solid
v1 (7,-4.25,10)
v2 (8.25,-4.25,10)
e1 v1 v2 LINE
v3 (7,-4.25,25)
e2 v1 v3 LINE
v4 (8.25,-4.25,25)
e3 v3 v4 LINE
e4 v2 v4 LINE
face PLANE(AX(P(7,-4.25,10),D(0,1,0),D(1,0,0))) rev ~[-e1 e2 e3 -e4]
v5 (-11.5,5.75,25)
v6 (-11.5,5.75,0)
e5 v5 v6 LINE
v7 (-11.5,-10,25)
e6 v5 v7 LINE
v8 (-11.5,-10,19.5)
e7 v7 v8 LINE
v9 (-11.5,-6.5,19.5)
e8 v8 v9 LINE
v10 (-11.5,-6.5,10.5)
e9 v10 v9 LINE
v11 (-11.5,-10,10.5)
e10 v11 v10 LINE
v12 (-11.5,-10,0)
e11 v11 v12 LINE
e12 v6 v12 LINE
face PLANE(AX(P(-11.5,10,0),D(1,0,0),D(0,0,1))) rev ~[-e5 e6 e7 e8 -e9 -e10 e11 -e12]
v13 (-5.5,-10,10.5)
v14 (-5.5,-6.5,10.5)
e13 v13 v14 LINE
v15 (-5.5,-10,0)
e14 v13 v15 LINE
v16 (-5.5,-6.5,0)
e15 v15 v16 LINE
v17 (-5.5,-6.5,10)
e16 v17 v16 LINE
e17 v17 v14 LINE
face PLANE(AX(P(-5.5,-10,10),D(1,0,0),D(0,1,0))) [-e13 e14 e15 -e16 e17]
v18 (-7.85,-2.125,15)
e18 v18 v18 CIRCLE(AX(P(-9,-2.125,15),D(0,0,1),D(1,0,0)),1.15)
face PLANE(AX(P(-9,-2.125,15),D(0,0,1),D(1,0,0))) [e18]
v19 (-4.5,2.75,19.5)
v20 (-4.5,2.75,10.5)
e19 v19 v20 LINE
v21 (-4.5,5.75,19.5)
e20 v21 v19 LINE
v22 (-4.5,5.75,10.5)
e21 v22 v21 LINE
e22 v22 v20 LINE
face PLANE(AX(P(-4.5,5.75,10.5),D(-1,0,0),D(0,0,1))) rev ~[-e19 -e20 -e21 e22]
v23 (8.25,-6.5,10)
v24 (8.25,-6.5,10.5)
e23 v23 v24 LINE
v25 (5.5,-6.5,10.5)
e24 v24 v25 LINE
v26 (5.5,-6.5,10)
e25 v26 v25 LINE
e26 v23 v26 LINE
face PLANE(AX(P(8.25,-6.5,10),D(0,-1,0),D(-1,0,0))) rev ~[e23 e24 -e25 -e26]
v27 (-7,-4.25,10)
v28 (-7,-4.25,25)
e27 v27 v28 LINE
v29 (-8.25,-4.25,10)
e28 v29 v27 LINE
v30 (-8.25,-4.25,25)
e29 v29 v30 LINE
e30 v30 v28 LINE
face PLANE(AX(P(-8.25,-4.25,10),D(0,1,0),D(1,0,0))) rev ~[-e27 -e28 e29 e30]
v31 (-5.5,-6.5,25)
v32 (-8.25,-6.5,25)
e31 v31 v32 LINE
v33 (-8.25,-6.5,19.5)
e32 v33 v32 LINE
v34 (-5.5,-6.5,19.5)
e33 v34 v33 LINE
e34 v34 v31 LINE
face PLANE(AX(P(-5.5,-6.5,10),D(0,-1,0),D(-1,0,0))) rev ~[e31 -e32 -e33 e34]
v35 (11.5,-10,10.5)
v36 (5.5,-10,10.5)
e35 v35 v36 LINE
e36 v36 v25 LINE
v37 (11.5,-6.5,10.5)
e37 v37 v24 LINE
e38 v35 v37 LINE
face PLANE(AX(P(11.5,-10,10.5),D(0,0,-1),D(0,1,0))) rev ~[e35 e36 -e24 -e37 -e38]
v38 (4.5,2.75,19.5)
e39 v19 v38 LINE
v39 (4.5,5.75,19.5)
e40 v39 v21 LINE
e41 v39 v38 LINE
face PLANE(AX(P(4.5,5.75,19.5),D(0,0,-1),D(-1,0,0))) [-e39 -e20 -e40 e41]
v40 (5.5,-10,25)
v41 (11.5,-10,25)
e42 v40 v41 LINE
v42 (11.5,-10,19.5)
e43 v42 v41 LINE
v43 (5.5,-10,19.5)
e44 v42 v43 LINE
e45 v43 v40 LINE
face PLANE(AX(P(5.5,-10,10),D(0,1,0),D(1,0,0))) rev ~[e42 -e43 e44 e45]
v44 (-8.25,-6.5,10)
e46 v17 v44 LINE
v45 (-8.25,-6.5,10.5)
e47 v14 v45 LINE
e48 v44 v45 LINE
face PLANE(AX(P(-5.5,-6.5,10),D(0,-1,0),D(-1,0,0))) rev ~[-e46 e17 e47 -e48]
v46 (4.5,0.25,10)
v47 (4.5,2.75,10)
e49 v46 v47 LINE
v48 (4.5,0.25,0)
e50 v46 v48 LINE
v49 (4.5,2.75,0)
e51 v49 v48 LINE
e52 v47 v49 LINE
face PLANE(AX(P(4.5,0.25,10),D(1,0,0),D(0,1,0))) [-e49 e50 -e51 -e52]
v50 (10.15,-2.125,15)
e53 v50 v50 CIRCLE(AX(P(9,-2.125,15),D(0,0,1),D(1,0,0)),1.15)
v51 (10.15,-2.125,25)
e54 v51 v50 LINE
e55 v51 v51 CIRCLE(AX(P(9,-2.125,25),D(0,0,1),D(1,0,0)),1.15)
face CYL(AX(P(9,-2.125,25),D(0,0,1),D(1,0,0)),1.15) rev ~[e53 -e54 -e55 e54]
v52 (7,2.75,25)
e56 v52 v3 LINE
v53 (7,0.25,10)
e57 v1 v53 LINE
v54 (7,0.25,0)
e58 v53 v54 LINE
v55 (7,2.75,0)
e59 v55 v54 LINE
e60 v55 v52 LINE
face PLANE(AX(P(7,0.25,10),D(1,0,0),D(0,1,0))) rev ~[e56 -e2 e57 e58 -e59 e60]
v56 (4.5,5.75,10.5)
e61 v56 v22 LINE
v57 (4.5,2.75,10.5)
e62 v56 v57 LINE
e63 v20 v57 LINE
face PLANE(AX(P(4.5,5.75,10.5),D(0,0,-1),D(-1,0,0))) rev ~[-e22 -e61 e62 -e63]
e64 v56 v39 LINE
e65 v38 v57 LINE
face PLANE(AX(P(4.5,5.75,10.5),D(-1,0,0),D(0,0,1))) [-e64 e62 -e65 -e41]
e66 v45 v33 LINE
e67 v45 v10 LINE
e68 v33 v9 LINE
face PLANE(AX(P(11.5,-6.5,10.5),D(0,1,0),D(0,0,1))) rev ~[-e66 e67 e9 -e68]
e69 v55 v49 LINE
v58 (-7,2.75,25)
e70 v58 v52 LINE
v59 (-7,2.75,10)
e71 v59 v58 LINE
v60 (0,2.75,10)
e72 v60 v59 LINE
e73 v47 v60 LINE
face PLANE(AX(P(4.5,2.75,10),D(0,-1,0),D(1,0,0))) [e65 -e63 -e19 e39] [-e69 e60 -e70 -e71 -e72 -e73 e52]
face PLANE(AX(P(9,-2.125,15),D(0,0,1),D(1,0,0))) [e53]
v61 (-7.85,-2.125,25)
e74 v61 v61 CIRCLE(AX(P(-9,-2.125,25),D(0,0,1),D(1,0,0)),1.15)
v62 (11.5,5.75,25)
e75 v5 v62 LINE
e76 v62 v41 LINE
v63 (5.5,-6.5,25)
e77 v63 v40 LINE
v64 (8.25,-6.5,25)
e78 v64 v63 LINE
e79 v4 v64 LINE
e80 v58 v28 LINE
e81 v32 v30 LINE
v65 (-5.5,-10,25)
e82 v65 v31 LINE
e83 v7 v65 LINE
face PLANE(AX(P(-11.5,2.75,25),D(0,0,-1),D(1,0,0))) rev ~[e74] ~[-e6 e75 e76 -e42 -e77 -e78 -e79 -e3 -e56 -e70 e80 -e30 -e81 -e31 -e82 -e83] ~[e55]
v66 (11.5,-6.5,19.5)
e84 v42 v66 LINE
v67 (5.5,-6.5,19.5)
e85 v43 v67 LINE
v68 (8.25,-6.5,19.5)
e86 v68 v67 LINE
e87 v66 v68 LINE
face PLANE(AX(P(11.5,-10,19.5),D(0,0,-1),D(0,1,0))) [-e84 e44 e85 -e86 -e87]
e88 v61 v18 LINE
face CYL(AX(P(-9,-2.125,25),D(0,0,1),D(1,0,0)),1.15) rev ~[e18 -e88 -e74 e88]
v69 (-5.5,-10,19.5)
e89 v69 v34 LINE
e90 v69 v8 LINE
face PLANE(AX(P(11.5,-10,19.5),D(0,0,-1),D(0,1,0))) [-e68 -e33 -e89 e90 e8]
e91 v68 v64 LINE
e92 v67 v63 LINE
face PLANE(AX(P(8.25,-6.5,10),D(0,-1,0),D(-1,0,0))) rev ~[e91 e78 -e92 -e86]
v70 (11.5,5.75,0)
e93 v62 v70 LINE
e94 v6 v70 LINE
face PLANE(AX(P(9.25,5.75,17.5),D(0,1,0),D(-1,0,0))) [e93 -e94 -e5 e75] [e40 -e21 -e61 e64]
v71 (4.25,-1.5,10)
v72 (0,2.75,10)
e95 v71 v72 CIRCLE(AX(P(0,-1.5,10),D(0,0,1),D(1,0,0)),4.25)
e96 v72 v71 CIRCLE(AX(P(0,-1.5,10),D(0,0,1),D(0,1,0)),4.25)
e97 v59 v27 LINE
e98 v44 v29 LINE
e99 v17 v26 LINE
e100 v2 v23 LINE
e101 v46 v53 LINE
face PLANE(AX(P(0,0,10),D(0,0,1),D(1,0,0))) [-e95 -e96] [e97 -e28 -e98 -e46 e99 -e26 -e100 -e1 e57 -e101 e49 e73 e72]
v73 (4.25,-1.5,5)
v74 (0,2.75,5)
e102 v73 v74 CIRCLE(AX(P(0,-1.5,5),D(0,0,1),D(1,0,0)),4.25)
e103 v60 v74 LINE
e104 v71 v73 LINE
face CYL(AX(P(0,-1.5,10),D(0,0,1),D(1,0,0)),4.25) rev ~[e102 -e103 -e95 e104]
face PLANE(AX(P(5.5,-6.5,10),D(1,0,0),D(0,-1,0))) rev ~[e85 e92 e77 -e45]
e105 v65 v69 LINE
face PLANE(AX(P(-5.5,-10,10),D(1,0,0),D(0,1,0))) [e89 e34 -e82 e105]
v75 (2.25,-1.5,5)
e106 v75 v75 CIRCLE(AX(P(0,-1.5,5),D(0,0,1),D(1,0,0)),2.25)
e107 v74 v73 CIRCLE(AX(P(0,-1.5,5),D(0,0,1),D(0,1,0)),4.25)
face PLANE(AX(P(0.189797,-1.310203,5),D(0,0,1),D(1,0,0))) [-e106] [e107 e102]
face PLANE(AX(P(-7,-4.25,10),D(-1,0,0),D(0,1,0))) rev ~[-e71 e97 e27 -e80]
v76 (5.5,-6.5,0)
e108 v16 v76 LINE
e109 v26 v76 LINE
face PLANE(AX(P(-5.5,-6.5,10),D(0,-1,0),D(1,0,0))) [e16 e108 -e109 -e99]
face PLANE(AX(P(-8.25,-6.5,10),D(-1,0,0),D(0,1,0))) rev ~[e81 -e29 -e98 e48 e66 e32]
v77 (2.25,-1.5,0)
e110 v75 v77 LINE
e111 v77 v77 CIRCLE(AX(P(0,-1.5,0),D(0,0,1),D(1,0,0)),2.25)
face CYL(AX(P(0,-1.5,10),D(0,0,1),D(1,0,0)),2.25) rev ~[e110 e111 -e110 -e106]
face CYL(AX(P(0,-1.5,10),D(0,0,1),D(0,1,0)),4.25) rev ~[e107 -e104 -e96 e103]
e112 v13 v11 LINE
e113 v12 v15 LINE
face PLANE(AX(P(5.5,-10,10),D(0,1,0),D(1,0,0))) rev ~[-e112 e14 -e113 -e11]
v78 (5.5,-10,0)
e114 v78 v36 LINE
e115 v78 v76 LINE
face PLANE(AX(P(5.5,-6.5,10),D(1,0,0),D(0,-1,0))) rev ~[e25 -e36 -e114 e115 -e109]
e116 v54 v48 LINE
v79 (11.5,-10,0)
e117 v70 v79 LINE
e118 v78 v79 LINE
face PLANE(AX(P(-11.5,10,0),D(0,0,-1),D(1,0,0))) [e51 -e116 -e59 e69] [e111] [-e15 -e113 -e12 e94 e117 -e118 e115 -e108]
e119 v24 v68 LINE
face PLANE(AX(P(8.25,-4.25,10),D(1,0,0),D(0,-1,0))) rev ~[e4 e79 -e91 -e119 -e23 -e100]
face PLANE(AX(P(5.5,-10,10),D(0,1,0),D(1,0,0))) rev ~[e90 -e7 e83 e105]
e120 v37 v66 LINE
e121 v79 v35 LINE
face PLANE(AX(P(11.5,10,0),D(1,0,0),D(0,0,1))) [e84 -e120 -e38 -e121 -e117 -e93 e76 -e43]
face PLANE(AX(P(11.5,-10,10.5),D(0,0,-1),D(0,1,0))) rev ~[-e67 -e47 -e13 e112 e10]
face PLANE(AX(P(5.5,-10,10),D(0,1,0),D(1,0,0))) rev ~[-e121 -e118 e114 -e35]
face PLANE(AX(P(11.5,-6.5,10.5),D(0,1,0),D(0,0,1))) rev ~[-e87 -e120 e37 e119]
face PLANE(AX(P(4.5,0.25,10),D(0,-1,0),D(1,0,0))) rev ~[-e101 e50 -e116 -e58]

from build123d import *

# Parameters (mm, degrees)
F0_W      = 23
F0_H      = 20
F1_DEPTH  = 10
F3_DEPTH  = 15
F4_W      = 11
F4_H      = 3.5
F5_DEPTH  = 10.001
F6_DEPTH  = 3.5
F7_W      = 4.5
F7_H      = 15
F7_W_2    = 18.5
F8_DEPTH  = 3
F9_DEPTH  = 7
F10_R     = 2.5
F11_DEPTH = 10.001
F10_R_2   = 5
F12_DEPTH = 4.5
F16_R     = 1.15
F17_DEPTH = 10
F18_R     = 2.25
F19_DEPTH = 10.001
F20_DEPTH = 5
F21_DEPTH = 10.001
F22_W     = 2.5
F22_H     = 2.5
F23_DEPTH = 10.001
F24_W     = 9
F24_H     = 9
F25_DEPTH = 15.751
F26_W     = 3.5
F26_H     = 9
F27_DEPTH = 23.001


# Not quite as in the source:
# - a feature names something its author has since deleted; it is built from what else it names


with BuildPart() as f1:
    # F0 (on Top) → F1 (new body)
    with BuildSketch(Plane.XY):
        Rectangle(F0_W, F0_H)
    extrude(amount=F1_DEPTH)

    # F2 (on face) → F3 (join)
    with BuildSketch(Plane.XY.offset(10)):
        Polygon((5.5, -6.5), (5.5, -10), (11.5, -10), (11.5, -0.75), (7, -0.75), (7, -4.25), (8.25, -4.25), (8.25, -6.5), align=None)
        Polygon((-11.5, -10), (-5.5, -10), (-5.5, -6.5), (-8.25, -6.5), (-8.25, -4.25), (-7, -4.25), (-7, -0.75), (-11.5, -0.75), align=None)
    extrude(amount=F3_DEPTH)

    # F4 (on face) → F5 (cut, through all)
    with BuildSketch(Plane.XY.offset(10)):
        with Locations((0, -8.25)):
            Rectangle(F4_W, F4_H)
    extrude(amount=-F5_DEPTH, mode=Mode.SUBTRACT)

    # F6 (add): faces of the model
    f6_faces = [f1.faces().sort_by_distance(p)[0] for p in [
        (9.25, -0.75, 17.5),
        (-9.25, -0.75, 17.5),
    ]]
    extrude(f6_faces, amount=F6_DEPTH)

    # F7 (on face) → F8 (join)
    with BuildSketch(Plane(origin=(0, 2.75, 0), x_dir=(-1, 0, 0), z_dir=(0, 1, 0))):
        with Locations((-9.25, 17.5)):
            Rectangle(F7_W, F7_H)
        with Locations((2.25, 17.5)):
            Rectangle(F7_W_2, F7_H)
    extrude(amount=F8_DEPTH)

    # F9 (add): a face of the model
    f9_faces = [f1.faces().sort_by_distance(p)[0] for p in [
        (0, 10, 5),
    ]]
    extrude(f9_faces, amount=F9_DEPTH)

    # F10 (on face) → F11 (cut, through all)
    with BuildSketch(Plane.XY.offset(10)):
        with Locations((0, 11.25)):
            Circle(F10_R)
    extrude(amount=-F11_DEPTH, mode=Mode.SUBTRACT)

    # F10 (on face) → F12 (cut)
    with BuildSketch(Plane.XY.offset(10)):
        with Locations((0, 11.25)):
            Circle(F10_R_2)
        with Locations((0, 11.25)):
            Circle(F10_R, mode=Mode.SUBTRACT)
    extrude(amount=-F12_DEPTH, mode=Mode.SUBTRACT)

    # F16 (on face) → F17 (cut)
    with BuildSketch(Plane.XY.offset(25)):
        with Locations((-9, -2.125)):
            Circle(F16_R)
        with Locations((9, -2.125)):
            Circle(F16_R)
    extrude(amount=-F17_DEPTH, mode=Mode.SUBTRACT)

    # F18 (on face) → F19 (cut, through all)
    with BuildSketch(Plane.XY.offset(10)):
        with Locations((0, -1.5)):
            Circle(F18_R)
    extrude(amount=-F19_DEPTH, mode=Mode.SUBTRACT)

    # F18 (on face) → F20 (cut)
    with BuildSketch(Plane.XY.offset(10)):
        with BuildLine():
            ThreePointArc((0, 2.75), (-3.00520382, -4.50520382), (4.25, -1.5))
            ThreePointArc((4.25, -1.5), (3.00520382, 1.50520382), (0, 2.75))
        make_face()
        with Locations((0, -1.5)):
            Circle(F18_R, mode=Mode.SUBTRACT)
    extrude(amount=-F20_DEPTH, mode=Mode.SUBTRACT)

    # F21 (cut, through all): faces of the model
    f21_faces = [f1.faces().sort_by_distance(p)[0] for p in [
        (-11.2439604523, 11.375, 10),
        (-4.8585786438, 11.25, 5.5),
    ]]
    extrude(f21_faces, amount=-F21_DEPTH, mode=Mode.SUBTRACT)

    # F22 (on face) → F23 (cut, through all)
    with BuildSketch(Plane.XY.offset(10)):
        with Locations((5.75, 1.5)):
            Rectangle(F22_W, F22_H)
    extrude(amount=-F23_DEPTH, mode=Mode.SUBTRACT)

    # F24 (on face) → F25 (cut, through all)
    with BuildSketch(Plane(origin=(0, 5.75, 0), x_dir=(-1, 0, 0), z_dir=(0, 1, 0))):
        with Locations((0, 15)):
            Rectangle(F24_W, F24_H)
    extrude(amount=-F25_DEPTH, mode=Mode.SUBTRACT)

    # F26 (on face) → F27 (cut, through all)
    with BuildSketch(Plane.YZ.offset(11.5)):
        with Locations((-8.25, 15)):
            Rectangle(F26_W, F26_H)
    extrude(amount=-F27_DEPTH, mode=Mode.SUBTRACT)


solid = f1.part
